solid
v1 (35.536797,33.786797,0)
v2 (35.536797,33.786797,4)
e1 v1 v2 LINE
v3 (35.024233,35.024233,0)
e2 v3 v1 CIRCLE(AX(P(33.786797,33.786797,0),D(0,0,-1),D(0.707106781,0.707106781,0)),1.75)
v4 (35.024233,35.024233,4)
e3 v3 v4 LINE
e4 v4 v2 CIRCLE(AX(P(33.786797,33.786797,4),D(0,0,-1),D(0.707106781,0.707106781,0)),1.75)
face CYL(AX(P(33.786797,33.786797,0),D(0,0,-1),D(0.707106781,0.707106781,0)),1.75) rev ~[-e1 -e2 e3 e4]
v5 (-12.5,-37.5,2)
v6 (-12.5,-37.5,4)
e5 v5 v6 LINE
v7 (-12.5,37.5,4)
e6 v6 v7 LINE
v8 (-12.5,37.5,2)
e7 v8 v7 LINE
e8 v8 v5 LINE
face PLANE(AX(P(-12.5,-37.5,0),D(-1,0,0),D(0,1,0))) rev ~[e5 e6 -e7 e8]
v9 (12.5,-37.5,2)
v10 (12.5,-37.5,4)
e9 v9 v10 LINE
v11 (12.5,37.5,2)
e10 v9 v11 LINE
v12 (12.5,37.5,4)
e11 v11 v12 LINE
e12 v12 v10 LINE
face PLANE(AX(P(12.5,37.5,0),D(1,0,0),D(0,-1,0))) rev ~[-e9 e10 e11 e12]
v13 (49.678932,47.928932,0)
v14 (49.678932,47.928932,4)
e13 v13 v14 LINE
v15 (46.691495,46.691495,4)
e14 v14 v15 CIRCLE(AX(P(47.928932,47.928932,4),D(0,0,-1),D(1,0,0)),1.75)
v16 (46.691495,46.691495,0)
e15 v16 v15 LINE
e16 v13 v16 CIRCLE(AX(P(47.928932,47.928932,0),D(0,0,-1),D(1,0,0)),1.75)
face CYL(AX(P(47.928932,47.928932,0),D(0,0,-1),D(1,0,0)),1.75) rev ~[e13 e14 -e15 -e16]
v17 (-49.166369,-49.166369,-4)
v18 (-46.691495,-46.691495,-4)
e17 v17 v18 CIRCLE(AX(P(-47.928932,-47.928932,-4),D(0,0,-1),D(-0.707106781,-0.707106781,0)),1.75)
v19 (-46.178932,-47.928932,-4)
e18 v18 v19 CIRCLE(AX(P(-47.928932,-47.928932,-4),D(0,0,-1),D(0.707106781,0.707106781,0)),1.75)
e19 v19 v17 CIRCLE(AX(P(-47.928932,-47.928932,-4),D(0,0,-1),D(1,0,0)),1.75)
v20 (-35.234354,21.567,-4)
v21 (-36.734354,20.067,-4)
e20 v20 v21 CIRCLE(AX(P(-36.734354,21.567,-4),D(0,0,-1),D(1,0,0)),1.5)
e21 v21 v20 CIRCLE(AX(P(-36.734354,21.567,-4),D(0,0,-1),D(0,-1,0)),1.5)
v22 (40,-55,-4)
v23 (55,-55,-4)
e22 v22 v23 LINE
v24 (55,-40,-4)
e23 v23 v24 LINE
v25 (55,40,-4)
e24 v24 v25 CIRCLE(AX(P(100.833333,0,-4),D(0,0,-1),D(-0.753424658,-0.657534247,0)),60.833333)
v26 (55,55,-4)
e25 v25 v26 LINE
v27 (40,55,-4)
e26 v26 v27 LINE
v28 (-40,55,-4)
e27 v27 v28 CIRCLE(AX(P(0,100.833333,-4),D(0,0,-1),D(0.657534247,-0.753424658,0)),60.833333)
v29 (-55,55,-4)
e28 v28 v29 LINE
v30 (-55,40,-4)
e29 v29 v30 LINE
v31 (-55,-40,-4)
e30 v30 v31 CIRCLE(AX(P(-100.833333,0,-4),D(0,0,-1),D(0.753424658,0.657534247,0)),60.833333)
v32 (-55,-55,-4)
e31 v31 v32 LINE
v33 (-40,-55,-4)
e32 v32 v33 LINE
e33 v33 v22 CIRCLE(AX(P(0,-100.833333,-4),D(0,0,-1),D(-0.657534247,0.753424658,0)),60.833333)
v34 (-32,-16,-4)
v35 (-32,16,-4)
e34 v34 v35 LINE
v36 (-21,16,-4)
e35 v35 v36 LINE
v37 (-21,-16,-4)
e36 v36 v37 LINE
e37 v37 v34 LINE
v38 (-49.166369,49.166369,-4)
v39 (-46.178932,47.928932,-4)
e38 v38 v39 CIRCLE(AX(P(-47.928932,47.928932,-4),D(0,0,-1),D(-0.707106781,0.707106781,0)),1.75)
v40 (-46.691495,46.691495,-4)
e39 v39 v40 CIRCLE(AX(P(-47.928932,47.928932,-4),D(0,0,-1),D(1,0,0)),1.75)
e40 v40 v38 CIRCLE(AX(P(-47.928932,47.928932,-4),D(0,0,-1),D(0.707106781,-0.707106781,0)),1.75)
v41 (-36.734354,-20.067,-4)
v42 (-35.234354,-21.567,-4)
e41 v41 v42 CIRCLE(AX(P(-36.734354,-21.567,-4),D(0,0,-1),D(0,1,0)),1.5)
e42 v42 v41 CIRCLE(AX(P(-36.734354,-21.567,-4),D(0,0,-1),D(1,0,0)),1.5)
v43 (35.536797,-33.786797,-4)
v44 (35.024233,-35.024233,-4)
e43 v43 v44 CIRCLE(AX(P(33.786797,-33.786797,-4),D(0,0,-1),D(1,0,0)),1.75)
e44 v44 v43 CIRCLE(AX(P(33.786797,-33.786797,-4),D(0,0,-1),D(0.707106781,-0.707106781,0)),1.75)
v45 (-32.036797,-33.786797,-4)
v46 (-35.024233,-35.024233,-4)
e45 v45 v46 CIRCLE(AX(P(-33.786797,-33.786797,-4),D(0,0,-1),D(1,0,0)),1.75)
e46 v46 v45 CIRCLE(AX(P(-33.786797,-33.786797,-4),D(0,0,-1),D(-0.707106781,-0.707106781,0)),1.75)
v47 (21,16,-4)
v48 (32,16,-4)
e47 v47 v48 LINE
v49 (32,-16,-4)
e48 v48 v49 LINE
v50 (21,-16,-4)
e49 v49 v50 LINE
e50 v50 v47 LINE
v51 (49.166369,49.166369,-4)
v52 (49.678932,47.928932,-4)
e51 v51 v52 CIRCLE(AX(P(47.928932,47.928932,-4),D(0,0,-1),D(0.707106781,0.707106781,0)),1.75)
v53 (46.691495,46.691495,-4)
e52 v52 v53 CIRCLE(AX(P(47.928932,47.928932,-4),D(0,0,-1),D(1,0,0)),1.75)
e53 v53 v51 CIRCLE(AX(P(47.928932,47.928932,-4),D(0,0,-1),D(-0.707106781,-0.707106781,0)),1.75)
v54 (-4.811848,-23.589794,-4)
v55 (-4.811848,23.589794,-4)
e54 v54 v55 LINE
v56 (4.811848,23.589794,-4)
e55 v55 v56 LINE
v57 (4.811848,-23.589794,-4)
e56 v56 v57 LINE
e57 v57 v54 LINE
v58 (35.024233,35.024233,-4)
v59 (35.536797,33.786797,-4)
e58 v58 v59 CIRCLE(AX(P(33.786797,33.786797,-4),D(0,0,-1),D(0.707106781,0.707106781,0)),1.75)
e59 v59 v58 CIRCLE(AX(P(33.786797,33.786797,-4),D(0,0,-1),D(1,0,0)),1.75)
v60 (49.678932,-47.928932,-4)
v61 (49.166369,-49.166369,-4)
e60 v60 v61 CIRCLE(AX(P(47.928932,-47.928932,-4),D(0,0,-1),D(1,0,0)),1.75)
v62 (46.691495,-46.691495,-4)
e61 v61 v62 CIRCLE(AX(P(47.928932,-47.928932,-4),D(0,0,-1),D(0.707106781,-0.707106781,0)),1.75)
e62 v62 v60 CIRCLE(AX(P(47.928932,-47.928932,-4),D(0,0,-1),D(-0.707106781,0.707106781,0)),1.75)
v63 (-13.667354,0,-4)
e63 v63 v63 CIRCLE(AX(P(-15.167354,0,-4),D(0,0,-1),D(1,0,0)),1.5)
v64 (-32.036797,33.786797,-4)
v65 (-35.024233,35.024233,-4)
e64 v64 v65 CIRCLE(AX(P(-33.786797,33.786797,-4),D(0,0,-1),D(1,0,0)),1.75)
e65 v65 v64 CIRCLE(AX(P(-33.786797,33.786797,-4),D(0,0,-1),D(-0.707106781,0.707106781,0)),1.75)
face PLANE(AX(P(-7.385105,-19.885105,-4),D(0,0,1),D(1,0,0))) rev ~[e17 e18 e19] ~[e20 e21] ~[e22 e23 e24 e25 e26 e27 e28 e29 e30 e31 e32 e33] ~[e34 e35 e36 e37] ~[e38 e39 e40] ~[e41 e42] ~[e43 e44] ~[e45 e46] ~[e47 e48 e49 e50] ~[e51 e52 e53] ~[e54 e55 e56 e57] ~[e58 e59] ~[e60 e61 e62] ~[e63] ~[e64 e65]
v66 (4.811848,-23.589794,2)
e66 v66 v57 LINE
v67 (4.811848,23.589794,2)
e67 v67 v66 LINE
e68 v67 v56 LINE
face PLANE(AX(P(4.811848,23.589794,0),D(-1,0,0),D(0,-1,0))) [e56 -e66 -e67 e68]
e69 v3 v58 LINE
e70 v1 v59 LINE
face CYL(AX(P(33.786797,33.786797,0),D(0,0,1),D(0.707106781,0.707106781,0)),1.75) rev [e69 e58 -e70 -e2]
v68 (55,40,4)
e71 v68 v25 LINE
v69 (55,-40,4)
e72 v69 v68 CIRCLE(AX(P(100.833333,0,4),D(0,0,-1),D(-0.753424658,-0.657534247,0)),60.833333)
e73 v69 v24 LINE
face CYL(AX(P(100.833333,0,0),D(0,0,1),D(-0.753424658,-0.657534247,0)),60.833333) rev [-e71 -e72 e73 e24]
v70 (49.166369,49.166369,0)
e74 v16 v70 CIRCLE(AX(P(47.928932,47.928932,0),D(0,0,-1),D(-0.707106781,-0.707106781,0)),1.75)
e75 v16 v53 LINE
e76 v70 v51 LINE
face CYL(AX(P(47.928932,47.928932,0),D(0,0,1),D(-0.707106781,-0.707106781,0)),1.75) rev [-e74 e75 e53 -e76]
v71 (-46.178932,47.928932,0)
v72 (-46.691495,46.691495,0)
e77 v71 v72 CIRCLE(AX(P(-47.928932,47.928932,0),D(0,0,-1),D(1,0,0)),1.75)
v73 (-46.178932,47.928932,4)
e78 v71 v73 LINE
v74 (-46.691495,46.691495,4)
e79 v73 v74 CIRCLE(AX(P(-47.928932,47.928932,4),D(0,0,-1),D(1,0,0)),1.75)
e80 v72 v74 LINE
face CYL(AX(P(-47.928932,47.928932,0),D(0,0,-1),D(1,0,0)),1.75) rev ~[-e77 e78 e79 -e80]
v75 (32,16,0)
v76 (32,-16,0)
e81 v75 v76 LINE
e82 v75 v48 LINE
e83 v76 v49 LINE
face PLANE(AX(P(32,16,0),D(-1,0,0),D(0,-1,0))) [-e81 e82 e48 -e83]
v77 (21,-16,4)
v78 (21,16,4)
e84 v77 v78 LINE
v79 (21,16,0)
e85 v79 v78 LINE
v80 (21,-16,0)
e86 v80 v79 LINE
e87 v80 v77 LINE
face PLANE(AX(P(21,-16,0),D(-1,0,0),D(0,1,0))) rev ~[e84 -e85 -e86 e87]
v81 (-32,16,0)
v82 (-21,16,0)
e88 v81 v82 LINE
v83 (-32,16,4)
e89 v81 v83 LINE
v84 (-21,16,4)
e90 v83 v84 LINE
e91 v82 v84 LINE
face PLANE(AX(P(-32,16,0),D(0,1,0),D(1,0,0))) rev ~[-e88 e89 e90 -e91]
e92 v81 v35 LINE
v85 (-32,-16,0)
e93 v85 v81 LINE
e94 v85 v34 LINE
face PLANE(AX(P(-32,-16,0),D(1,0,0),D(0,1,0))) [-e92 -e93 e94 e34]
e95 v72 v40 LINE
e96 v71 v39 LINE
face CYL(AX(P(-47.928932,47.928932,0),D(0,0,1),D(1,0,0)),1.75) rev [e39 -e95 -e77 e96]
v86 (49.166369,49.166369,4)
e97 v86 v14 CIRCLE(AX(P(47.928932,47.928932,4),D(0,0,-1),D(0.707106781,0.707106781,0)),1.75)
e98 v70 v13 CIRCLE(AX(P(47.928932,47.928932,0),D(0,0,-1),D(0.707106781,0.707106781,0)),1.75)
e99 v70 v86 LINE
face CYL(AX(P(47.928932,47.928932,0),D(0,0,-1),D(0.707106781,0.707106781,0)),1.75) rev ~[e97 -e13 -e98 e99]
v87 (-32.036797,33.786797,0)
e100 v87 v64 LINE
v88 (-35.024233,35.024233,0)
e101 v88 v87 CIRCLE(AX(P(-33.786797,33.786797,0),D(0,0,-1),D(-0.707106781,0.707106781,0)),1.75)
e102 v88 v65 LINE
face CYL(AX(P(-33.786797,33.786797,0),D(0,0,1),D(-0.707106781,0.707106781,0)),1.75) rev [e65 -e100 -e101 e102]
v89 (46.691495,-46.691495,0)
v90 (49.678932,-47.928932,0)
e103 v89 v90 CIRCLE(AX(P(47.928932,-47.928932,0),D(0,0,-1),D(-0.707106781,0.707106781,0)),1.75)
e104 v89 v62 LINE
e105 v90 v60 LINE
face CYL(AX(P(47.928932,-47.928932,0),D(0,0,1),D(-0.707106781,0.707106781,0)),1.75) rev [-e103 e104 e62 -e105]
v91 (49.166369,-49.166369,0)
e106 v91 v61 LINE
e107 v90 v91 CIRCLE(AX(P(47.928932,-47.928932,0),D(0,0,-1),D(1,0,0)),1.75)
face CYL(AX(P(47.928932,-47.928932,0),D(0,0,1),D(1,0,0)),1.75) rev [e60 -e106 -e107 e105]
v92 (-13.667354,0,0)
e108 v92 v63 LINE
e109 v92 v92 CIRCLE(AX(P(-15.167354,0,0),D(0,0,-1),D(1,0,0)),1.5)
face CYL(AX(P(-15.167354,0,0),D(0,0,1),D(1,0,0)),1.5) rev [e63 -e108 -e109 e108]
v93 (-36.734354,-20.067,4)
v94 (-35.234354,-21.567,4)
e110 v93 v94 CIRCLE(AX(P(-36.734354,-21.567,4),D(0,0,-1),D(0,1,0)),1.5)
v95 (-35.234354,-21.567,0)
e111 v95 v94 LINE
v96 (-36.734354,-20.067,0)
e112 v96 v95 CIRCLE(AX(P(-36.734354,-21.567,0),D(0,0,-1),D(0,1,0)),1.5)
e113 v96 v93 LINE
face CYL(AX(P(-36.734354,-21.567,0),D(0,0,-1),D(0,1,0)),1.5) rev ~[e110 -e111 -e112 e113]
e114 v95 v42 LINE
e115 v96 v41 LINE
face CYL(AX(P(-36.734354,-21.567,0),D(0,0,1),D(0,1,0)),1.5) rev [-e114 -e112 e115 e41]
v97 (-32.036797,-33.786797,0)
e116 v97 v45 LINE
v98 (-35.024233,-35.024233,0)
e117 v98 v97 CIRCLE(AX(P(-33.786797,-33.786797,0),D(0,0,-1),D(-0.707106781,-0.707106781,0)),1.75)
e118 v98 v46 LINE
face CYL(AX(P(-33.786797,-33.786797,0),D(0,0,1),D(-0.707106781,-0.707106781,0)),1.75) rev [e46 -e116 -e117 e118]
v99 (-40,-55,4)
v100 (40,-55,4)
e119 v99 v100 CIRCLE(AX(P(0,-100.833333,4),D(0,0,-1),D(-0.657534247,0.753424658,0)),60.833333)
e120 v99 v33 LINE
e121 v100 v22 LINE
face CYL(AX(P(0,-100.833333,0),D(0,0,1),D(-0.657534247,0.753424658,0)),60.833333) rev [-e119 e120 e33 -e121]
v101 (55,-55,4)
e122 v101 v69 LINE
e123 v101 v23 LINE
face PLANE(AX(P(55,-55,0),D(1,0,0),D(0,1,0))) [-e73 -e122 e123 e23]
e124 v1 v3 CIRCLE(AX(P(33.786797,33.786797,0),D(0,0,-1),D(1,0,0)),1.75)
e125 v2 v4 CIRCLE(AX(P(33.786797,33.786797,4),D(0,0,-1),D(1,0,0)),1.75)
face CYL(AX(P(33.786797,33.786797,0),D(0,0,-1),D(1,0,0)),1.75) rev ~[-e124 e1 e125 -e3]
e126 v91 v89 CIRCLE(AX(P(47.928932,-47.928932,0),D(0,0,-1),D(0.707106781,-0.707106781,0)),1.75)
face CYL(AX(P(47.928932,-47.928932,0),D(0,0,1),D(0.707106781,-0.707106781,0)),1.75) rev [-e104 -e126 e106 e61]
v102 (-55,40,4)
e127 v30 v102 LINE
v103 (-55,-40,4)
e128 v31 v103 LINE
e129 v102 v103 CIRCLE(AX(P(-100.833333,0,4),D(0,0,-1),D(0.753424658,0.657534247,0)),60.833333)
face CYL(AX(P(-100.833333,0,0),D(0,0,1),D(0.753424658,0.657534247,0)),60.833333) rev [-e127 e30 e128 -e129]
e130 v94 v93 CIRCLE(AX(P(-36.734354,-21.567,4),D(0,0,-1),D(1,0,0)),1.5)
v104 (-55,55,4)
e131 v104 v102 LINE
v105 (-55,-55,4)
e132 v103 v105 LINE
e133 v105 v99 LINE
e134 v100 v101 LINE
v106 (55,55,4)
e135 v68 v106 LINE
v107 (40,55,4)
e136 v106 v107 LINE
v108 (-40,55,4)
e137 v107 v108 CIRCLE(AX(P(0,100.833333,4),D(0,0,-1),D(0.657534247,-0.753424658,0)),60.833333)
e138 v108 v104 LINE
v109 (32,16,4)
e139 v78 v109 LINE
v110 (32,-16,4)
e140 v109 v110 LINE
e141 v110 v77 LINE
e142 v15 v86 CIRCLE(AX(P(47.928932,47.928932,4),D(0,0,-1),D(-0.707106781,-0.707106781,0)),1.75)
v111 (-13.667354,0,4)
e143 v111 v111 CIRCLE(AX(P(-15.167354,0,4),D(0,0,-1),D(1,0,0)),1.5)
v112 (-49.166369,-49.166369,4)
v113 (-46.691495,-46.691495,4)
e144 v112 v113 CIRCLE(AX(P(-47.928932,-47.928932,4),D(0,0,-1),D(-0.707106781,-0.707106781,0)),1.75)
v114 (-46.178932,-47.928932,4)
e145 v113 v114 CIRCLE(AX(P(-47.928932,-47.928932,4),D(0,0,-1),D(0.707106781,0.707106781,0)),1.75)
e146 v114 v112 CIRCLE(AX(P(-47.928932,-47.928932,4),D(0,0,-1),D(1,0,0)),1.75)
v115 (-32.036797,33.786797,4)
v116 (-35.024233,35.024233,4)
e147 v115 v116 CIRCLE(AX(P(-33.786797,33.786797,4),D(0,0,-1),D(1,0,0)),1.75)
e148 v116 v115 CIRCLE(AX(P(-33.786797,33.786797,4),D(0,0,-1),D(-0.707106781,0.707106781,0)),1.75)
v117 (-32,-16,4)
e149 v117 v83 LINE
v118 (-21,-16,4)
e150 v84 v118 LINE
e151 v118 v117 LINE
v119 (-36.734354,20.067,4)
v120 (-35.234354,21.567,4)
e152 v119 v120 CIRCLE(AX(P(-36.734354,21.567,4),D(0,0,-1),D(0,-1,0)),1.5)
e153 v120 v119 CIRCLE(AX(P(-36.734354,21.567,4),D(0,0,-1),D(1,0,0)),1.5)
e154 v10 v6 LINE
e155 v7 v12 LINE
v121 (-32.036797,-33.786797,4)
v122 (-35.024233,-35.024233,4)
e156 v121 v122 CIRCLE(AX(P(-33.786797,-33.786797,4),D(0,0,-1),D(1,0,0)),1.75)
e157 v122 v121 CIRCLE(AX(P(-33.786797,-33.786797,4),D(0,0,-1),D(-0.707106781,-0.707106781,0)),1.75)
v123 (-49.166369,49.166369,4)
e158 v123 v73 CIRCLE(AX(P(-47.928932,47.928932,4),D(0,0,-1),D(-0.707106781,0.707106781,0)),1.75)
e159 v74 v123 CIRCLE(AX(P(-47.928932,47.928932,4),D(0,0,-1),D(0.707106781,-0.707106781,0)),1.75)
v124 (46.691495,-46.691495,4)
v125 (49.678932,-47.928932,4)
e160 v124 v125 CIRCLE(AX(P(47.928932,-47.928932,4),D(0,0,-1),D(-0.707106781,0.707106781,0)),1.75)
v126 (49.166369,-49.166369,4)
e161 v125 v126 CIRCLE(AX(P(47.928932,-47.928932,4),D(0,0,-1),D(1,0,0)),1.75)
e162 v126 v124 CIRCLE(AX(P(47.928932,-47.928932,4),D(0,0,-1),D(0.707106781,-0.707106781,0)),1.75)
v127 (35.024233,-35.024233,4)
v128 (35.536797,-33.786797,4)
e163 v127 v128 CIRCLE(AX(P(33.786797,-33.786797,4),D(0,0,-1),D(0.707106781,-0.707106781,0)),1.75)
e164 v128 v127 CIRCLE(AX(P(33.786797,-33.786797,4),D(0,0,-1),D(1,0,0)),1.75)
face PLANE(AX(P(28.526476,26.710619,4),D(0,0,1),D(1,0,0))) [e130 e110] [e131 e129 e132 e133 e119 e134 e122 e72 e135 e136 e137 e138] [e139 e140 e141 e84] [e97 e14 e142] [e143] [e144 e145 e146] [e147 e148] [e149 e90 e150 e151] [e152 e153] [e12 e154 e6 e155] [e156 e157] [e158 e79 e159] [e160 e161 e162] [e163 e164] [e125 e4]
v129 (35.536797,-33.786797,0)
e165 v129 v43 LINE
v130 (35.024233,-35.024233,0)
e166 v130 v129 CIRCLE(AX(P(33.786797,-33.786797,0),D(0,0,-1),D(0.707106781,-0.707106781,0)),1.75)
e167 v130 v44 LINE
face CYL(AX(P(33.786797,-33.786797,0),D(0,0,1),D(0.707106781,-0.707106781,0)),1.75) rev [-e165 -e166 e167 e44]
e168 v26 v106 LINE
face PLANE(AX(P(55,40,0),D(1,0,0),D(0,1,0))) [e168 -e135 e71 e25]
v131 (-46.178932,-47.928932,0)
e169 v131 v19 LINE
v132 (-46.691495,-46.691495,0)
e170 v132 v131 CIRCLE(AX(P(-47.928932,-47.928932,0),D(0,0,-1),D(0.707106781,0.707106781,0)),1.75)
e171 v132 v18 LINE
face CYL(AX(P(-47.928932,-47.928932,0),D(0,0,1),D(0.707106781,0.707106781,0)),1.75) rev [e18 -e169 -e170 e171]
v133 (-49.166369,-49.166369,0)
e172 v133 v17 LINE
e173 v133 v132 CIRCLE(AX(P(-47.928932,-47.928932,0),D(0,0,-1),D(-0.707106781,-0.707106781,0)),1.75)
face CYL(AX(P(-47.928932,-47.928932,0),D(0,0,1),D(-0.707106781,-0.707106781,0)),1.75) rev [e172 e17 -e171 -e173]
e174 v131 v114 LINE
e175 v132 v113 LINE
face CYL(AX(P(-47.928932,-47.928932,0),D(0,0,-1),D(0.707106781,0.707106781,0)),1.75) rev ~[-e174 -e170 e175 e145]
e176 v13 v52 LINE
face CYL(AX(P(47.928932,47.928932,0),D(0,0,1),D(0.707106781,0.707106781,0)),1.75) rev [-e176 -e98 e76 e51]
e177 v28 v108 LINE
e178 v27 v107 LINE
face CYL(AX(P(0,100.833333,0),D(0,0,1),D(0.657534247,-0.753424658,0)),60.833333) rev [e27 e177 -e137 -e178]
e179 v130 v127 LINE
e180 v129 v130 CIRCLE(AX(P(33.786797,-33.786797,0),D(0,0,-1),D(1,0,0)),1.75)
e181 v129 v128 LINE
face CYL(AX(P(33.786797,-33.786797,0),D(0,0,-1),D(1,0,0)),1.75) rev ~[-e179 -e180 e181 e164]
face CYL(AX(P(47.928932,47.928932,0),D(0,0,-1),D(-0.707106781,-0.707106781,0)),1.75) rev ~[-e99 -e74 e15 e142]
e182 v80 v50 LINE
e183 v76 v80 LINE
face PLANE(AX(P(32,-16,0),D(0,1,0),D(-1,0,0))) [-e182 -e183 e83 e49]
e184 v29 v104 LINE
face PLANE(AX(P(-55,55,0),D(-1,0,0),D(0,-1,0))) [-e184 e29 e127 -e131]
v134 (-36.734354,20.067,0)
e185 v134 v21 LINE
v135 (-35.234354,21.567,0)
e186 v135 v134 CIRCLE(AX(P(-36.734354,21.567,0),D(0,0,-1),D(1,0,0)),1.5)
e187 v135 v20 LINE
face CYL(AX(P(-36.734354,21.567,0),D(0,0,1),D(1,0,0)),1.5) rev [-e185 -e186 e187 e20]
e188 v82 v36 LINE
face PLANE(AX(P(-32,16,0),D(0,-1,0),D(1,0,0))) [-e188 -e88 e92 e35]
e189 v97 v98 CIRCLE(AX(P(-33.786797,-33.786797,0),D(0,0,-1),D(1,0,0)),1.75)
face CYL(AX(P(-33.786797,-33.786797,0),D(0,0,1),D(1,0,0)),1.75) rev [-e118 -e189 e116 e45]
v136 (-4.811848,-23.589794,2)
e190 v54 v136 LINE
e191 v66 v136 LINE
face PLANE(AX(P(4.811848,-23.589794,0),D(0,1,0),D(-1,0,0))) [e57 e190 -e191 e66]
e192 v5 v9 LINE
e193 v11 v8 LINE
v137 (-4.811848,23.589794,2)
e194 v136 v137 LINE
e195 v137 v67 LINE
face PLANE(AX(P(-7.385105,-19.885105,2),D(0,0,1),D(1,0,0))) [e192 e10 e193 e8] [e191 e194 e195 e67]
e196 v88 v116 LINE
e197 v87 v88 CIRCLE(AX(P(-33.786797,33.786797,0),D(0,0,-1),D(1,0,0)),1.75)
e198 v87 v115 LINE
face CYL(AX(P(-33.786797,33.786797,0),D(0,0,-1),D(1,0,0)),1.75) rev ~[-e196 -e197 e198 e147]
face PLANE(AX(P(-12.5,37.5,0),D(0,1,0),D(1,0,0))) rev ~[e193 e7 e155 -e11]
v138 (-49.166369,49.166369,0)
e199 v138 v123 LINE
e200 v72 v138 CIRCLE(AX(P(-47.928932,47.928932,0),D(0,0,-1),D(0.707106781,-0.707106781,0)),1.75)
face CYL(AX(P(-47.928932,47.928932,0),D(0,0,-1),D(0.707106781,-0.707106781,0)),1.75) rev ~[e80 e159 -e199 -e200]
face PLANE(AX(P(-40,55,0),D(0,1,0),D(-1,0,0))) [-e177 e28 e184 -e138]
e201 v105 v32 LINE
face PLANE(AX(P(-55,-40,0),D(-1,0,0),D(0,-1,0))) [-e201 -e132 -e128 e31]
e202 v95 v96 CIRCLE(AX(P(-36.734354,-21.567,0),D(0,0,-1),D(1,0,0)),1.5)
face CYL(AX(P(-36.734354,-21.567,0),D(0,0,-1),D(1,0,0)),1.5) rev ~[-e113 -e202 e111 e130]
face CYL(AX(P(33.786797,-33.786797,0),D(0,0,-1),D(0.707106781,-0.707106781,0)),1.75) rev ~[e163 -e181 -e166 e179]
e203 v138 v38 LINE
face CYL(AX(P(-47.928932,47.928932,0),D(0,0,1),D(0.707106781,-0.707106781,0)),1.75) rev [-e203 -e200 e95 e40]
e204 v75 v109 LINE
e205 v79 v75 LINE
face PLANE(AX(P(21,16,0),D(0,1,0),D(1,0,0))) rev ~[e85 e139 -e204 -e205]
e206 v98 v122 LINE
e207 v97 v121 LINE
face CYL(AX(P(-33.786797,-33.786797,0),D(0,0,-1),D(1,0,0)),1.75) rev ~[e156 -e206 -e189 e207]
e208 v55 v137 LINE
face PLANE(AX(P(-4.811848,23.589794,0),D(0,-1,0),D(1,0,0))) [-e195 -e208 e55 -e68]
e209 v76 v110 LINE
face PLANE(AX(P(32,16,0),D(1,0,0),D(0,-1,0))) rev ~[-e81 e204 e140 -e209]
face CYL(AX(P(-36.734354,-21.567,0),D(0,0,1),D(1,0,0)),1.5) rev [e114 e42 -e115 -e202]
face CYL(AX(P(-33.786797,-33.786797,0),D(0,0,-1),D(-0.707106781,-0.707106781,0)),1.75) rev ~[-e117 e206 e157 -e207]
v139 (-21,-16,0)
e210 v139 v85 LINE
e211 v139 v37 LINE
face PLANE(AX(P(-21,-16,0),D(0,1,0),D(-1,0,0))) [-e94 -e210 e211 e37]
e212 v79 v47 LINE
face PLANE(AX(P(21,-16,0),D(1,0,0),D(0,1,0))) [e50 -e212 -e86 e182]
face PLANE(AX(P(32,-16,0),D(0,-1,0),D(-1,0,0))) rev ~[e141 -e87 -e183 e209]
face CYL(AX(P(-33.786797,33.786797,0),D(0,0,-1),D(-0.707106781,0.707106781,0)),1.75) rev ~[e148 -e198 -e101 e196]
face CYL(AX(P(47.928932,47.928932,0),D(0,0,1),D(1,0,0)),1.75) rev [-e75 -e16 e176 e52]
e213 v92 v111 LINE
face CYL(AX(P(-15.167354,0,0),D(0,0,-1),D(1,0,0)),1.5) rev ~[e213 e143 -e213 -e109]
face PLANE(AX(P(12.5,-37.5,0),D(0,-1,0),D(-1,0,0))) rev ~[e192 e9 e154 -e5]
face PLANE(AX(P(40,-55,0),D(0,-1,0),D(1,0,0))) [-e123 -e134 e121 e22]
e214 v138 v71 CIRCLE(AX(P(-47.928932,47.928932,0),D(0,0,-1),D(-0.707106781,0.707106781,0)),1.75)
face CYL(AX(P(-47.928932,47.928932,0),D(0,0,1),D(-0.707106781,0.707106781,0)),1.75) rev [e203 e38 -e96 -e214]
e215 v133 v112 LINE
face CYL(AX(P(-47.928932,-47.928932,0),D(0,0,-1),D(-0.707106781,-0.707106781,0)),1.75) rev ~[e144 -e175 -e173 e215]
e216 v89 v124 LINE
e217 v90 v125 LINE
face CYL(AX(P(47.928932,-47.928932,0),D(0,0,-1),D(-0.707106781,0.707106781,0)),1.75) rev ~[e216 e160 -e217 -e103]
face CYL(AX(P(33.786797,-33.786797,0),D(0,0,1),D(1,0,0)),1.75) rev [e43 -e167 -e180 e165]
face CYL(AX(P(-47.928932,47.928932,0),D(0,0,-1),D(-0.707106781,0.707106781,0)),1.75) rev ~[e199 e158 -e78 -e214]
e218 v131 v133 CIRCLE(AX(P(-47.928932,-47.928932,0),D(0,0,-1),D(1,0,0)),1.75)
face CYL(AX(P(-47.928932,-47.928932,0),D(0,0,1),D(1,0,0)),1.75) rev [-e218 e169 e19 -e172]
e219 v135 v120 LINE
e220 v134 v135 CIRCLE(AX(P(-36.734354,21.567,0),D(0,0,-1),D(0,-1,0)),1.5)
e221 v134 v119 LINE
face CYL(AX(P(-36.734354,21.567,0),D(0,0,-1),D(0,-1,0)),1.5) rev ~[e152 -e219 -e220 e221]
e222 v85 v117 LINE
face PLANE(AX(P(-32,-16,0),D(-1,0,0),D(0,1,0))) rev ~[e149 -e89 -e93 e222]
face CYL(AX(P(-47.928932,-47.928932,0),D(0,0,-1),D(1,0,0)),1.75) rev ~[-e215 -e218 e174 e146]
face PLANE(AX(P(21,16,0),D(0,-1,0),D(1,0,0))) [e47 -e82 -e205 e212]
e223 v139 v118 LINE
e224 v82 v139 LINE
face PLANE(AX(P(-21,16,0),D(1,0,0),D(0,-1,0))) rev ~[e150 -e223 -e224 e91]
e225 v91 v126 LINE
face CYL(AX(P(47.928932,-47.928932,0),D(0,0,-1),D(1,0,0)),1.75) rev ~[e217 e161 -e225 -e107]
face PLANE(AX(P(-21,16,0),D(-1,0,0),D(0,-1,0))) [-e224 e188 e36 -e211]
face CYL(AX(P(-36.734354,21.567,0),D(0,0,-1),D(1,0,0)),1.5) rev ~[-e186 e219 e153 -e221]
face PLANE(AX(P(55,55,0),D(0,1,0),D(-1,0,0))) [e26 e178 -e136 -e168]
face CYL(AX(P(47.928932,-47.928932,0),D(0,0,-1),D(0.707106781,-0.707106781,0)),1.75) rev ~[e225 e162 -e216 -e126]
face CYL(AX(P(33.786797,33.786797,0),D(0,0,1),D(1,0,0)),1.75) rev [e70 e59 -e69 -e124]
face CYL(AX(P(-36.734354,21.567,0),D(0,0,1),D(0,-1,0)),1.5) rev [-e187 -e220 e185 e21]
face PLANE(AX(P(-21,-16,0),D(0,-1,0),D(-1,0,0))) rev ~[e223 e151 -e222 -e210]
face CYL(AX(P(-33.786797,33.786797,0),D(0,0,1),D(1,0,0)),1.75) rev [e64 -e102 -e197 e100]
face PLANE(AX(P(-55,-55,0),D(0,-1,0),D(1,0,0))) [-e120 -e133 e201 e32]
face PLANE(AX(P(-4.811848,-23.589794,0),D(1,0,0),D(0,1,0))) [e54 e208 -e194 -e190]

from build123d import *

# Parameters (mm, degrees)
F1_DEPTH = 4
F2_DEPTH = 2
F3_DEPTH = 4


# Not quite as in the source:
# - a feature names something its author has since deleted; it is built from what else it names


with BuildPart() as f1:
    # F0 (on Top) → F1 (new body, symmetric)
    with BuildSketch(Plane.XY):
        with BuildLine():
            Line((55, 40), (55, 55))
            Line((55, 55), (40, 55))
            ThreePointArc((40, 55), (21.3600093633, 43.8733083646), (0, 40))
            Line((0, 40), (0, 37.5))
            Line((0, 37.5), (12.5, 37.5))
            Line((12.5, 37.5), (12.5, 0))
            Line((12.5, 0), (21, 0))
            Line((21, 0), (21, 16))
            Line((21, 16), (32, 16))
            Line((32, 16), (32, 0))
            Line((32, 0), (40, 0))
            ThreePointArc((40, 0), (43.8733083645, 21.3600093633), (55, 40))
        make_face()
        with BuildLine():
            ThreePointArc((35.5367965644, 33.7867965644), (32.1700073825, 33.1171005578), (35.0242334315, 35.0242334315))
            ThreePointArc((35.0242334315, 35.0242334315), (35.4035857463, 34.456492571), (35.5367965644, 33.7867965644))
        make_face(mode=Mode.SUBTRACT)
        with BuildLine():
            ThreePointArc((46.6914953211, 46.6914953211), (46.6914953211, 49.1663690552), (49.1663690552, 49.1663690552))
            ThreePointArc((49.1663690552, 49.1663690552), (49.54572137, 48.5986281948), (49.6789321881, 47.9289321881))
            ThreePointArc((49.6789321881, 47.9289321881), (48.5986281948, 46.3121430062), (46.6914953211, 46.6914953211))
        make_face(mode=Mode.SUBTRACT)
        with BuildLine():
            Line((-12.5, -37.5), (-12.5, 0))
            Line((-12.5, 0), (-13.6673537509, 0))
            ThreePointArc((-13.6673537509, 0), (-15.1673537509, -1.5), (-16.6673537509, 0))
            Line((-16.6673537509, 0), (-21, 0))
            Line((-21, 0), (-21, -16))
            Line((-21, -16), (-32, -16))
            Line((-32, -16), (-32, 0))
            Line((-32, 0), (-36.7343537509, 0))
            Line((-36.7343537509, 0), (-40, 0))
            ThreePointArc((-40, 0), (-43.8733083645, -21.3600093633), (-55, -40))
            Line((-55, -40), (-55, -55))
            Line((-55, -55), (-40, -55))
            ThreePointArc((-40, -55), (-21.3600093633, -43.8733083646), (0, -40))
            Line((0, -40), (0, -37.5))
            Line((0, -37.5), (-12.5, -37.5))
        make_face()
        with BuildLine():
            ThreePointArc((-46.1789321881, -47.9289321881), (-47.2592361815, -49.54572137), (-49.1663690552, -49.1663690552))
            ThreePointArc((-49.1663690552, -49.1663690552), (-49.1663690552, -46.6914953211), (-46.6914953211, -46.6914953211))
            ThreePointArc((-46.6914953211, -46.6914953211), (-46.3121430062, -47.2592361815), (-46.1789321881, -47.9289321881))
        make_face(mode=Mode.SUBTRACT)
        with BuildLine():
            ThreePointArc((-32.0367965644, -33.7867965644), (-33.1171005578, -35.4035857463), (-35.0242334315, -35.0242334315))
            ThreePointArc((-35.0242334315, -35.0242334315), (-34.456492571, -32.1700073825), (-32.0367965644, -33.7867965644))
        make_face(mode=Mode.SUBTRACT)
        with BuildLine():
            ThreePointArc((-35.2343537509, -21.567), (-37.7950139227, -22.6276601718), (-36.7343537509, -20.067))
            ThreePointArc((-36.7343537509, -20.067), (-35.6736935792, -20.5063398282), (-35.2343537509, -21.567))
        make_face(mode=Mode.SUBTRACT)
        with BuildLine():
            Line((0, 37.5), (0, 40))
            ThreePointArc((0, 40), (-21.3600093633, 43.8733083645), (-40, 55))
            Line((-40, 55), (-55, 55))
            Line((-55, 55), (-55, 40))
            ThreePointArc((-55, 40), (-43.8733083646, 21.3600093633), (-40, 0))
            Line((-40, 0), (-36.7343537509, 0))
            Line((-36.7343537509, 0), (-32, 0))
            Line((-32, 0), (-32, 16))
            Line((-32, 16), (-21, 16))
            Line((-21, 16), (-21, 0))
            Line((-21, 0), (-16.6673537509, 0))
            ThreePointArc((-16.6673537509, 0), (-15.1673537509, 1.5), (-13.6673537509, 0))
            Line((-13.6673537509, 0), (-12.5, 0))
            Line((-12.5, 0), (-12.5, 37.5))
            Line((-12.5, 37.5), (0, 37.5))
        make_face()
        with BuildLine():
            ThreePointArc((-35.2343537509, 21.567), (-35.6736935792, 20.5063398282), (-36.7343537509, 20.067))
            ThreePointArc((-36.7343537509, 20.067), (-37.7950139227, 22.6276601718), (-35.2343537509, 21.567))
        make_face(mode=Mode.SUBTRACT)
        with BuildLine():
            ThreePointArc((-32.0367965644, 33.7867965644), (-34.456492571, 32.1700073825), (-35.0242334315, 35.0242334315))
            ThreePointArc((-35.0242334315, 35.0242334315), (-33.1171005578, 35.4035857463), (-32.0367965644, 33.7867965644))
        make_face(mode=Mode.SUBTRACT)
        with BuildLine():
            ThreePointArc((-46.6914953211, 46.6914953211), (-49.1663690552, 46.6914953211), (-49.1663690552, 49.1663690552))
            ThreePointArc((-49.1663690552, 49.1663690552), (-47.2592361815, 49.54572137), (-46.1789321881, 47.9289321881))
            ThreePointArc((-46.1789321881, 47.9289321881), (-46.3121430062, 47.2592361815), (-46.6914953211, 46.6914953211))
        make_face(mode=Mode.SUBTRACT)
        with BuildLine():
            ThreePointArc((55, -40), (43.8733083646, -21.3600093633), (40, 0))
            Line((40, 0), (32, 0))
            Line((32, 0), (32, -16))
            Line((32, -16), (21, -16))
            Line((21, -16), (21, 0))
            Line((21, 0), (12.5, 0))
            Line((12.5, 0), (12.5, -37.5))
            Line((12.5, -37.5), (0, -37.5))
            Line((0, -37.5), (0, -40))
            ThreePointArc((0, -40), (21.3600093633, -43.8733083645), (40, -55))
            Line((40, -55), (55, -55))
            Line((55, -55), (55, -40))
        make_face()
        with BuildLine():
            ThreePointArc((49.6789321881, -47.9289321881), (49.54572137, -48.5986281948), (49.1663690552, -49.1663690552))
            ThreePointArc((49.1663690552, -49.1663690552), (46.6914953211, -49.1663690552), (46.6914953211, -46.6914953211))
            ThreePointArc((46.6914953211, -46.6914953211), (48.5986281948, -46.3121430062), (49.6789321881, -47.9289321881))
        make_face(mode=Mode.SUBTRACT)
        with BuildLine():
            ThreePointArc((35.5367965644, -33.7867965644), (35.4035857463, -34.456492571), (35.0242334315, -35.0242334315))
            ThreePointArc((35.0242334315, -35.0242334315), (32.1700073825, -33.1171005578), (35.5367965644, -33.7867965644))
        make_face(mode=Mode.SUBTRACT)
    extrude(amount=F1_DEPTH, both=True)

    # F0 (on Top) → F2 (join, symmetric)
    with BuildSketch(Plane.XY):
        Polygon((-4.8118475825, 0), (-12.5, 0), (-12.5, -37.5), (0, -37.5), (0, -23.5897935927), (-4.8118475825, -23.5897935927), align=None)
        Polygon((12.5, -37.5), (12.5, 0), (4.8118475825, 0), (4.8118475825, -23.5897935927), (0, -23.5897935927), (0, -37.5), align=None)
        Polygon((0, 23.5897935927), (0, 37.5), (-12.5, 37.5), (-12.5, 0), (-4.8118475825, 0), (-4.8118475825, 23.5897935927), align=None)
        Polygon((12.5, 37.5), (0, 37.5), (0, 23.5897935927), (4.8118475825, 23.5897935927), (4.8118475825, 0), (12.5, 0), align=None)
    extrude(amount=F2_DEPTH, both=True)

    # F0 (on Top) → F3 (join)
    with BuildSketch(Plane.XY):
        Polygon((-4.8118475825, 0), (-12.5, 0), (-12.5, -37.5), (0, -37.5), (0, -23.5897935927), (-4.8118475825, -23.5897935927), align=None)
        Polygon((12.5, -37.5), (12.5, 0), (4.8118475825, 0), (4.8118475825, -23.5897935927), (0, -23.5897935927), (0, -37.5), align=None)
        Polygon((0, 23.5897935927), (0, 37.5), (-12.5, 37.5), (-12.5, 0), (-4.8118475825, 0), (-4.8118475825, 23.5897935927), align=None)
        Polygon((12.5, 37.5), (0, 37.5), (0, 23.5897935927), (4.8118475825, 23.5897935927), (4.8118475825, 0), (12.5, 0), align=None)
    extrude(amount=-F3_DEPTH)


solid = f1.part
